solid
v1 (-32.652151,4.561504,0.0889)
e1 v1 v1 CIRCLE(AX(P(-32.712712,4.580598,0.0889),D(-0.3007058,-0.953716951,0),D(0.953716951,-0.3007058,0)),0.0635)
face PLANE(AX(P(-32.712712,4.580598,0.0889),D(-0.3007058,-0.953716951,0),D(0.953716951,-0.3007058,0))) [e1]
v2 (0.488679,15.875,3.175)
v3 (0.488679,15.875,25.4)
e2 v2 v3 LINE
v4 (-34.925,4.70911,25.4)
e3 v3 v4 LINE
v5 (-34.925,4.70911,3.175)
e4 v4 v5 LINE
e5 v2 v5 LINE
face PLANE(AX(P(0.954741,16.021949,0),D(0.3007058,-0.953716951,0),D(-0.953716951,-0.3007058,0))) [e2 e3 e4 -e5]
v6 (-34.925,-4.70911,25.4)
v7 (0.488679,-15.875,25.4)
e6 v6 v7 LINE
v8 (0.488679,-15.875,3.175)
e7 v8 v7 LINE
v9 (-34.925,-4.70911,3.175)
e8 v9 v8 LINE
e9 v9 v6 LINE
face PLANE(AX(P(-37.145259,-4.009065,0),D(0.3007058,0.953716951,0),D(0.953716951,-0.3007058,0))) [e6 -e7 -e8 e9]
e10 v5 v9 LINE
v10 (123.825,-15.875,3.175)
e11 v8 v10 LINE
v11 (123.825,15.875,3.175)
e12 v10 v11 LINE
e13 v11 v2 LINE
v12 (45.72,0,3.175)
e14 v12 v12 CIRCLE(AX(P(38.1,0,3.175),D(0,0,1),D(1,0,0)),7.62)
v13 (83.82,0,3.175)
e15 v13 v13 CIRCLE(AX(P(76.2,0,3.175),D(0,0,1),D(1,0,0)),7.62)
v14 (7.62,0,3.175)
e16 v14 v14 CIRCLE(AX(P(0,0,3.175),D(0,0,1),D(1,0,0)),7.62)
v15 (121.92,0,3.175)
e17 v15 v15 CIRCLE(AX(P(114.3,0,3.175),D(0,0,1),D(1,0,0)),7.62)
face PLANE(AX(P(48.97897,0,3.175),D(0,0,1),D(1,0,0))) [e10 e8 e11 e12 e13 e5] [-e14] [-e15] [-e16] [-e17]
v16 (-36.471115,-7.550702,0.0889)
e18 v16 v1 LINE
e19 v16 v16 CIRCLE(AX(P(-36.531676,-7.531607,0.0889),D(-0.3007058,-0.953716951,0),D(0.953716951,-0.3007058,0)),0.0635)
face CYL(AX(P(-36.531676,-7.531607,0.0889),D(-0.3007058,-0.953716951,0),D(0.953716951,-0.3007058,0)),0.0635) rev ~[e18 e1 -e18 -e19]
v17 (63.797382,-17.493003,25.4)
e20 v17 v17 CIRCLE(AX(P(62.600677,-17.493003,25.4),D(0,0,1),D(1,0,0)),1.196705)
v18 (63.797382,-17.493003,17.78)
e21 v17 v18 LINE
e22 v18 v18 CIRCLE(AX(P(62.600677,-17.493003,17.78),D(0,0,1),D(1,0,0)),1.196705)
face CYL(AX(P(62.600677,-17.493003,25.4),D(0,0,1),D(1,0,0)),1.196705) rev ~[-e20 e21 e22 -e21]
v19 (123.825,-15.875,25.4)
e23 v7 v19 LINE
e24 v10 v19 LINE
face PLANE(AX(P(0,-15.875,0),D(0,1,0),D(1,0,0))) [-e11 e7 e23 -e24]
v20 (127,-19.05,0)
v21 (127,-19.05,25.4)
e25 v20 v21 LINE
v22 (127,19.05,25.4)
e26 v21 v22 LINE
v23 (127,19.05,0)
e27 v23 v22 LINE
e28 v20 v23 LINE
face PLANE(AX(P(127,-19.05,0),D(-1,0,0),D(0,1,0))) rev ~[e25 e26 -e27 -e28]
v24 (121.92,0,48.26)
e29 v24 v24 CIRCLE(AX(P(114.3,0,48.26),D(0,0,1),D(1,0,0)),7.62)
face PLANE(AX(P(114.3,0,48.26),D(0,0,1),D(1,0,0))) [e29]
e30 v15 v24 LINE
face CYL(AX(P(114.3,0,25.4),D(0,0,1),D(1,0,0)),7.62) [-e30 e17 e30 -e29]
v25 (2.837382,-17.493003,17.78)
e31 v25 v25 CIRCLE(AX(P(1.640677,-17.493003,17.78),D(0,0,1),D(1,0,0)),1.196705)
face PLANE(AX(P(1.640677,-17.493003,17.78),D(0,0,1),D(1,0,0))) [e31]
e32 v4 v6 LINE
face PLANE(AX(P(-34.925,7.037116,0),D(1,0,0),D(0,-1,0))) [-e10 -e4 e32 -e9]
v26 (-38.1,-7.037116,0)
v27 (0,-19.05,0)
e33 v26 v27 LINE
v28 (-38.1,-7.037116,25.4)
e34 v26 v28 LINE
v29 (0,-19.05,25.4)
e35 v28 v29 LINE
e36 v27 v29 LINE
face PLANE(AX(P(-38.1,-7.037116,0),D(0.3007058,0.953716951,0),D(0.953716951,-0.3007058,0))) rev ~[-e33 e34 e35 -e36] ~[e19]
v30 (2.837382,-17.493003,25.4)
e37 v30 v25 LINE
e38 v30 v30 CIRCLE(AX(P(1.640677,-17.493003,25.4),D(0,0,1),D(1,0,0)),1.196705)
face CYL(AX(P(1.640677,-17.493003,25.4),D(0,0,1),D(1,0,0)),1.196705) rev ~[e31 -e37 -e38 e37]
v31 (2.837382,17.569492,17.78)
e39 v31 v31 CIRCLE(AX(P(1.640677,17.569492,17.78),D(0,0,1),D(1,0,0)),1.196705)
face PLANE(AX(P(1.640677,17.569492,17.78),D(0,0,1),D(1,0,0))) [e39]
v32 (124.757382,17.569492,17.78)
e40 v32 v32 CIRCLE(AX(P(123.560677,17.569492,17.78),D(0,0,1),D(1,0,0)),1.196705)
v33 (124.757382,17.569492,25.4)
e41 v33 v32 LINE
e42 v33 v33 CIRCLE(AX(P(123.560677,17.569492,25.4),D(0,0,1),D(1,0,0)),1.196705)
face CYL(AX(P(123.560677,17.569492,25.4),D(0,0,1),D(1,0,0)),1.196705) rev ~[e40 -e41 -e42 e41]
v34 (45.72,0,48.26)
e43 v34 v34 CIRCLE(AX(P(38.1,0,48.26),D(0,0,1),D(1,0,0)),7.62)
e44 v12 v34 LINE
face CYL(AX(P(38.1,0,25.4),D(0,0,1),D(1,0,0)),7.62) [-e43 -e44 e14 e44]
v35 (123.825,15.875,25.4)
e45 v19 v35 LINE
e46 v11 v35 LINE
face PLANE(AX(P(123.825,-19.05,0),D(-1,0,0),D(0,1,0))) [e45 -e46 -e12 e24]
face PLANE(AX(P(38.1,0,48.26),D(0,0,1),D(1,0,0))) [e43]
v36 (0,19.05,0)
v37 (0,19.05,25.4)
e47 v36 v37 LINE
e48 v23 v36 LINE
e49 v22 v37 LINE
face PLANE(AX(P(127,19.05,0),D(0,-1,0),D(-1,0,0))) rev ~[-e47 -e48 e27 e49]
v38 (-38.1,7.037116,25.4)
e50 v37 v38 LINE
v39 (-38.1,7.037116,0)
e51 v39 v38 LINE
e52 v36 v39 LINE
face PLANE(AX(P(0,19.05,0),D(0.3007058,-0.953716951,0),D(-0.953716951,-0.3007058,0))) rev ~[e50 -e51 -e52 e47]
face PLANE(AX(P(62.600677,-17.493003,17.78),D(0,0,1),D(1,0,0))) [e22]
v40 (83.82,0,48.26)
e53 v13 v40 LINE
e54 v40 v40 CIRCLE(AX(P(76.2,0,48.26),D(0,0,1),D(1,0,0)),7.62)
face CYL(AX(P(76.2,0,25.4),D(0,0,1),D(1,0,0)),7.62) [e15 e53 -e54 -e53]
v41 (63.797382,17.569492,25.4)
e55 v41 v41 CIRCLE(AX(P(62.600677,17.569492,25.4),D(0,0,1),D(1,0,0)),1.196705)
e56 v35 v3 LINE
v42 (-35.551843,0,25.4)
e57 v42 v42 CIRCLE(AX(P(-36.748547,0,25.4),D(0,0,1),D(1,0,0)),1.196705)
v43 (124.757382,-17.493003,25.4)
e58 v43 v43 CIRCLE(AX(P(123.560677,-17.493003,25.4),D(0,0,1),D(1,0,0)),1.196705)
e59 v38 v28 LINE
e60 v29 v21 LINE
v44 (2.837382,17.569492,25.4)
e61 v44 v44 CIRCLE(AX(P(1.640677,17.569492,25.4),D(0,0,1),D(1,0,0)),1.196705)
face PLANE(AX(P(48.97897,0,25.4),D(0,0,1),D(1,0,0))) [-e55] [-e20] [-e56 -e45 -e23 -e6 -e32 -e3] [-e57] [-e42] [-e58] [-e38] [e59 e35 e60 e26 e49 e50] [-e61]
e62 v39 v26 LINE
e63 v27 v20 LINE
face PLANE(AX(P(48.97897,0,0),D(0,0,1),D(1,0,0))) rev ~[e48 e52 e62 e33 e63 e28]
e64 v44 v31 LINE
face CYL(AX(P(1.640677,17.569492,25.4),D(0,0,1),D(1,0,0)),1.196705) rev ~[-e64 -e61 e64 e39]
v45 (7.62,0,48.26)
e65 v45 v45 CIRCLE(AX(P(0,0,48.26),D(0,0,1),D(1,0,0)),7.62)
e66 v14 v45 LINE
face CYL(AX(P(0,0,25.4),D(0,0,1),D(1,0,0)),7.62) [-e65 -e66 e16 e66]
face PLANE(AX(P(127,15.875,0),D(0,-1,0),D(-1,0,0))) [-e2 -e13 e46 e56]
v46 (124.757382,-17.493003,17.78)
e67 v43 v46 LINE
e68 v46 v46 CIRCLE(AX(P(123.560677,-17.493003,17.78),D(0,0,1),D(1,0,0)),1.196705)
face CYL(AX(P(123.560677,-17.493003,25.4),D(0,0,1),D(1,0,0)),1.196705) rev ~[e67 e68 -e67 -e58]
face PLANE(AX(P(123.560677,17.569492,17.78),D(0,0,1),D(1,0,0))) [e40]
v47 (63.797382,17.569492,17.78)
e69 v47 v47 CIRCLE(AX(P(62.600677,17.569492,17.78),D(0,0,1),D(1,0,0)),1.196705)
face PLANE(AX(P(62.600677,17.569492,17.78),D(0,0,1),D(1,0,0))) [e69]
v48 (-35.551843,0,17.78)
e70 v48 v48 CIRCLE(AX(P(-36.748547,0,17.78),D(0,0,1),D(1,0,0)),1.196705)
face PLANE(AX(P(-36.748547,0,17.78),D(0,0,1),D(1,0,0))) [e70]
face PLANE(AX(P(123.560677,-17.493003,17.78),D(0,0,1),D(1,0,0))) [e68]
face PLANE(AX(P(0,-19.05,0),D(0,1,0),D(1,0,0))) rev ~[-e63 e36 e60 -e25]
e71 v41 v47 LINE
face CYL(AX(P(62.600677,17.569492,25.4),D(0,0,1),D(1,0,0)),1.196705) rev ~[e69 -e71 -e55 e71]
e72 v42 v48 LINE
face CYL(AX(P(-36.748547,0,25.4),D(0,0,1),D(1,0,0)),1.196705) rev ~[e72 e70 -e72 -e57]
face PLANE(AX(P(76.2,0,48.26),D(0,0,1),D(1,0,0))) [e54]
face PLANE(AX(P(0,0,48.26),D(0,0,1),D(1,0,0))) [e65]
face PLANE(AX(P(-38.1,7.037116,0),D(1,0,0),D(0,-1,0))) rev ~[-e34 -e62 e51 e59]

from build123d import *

# Parameters (mm, degrees)
F1_DEPTH      = 25.4
F3_T          = -3.175
F2_R          = 7.62
F4_DEPTH      = 22.86
F4_DEPTH_BACK = 22.225
F5_R          = 1.1967045105
F6_DEPTH      = 7.62
F7_R          = 0.0635
F8_DEPTH      = 12.7


# Not quite as in the source:
# - a feature names something its author has since deleted; it is built from what else it names


with BuildPart() as f1:
    # F0 (on Top) → F1 (new body)
    with BuildSketch(Plane.XY):
        Polygon((-38.1, 7.0371161437), (-38.1, -7.0371161437), (0, -19.05), (127, -19.05), (127, 19.05), (0, 19.05), align=None)
    extrude(amount=F1_DEPTH)

    # F3
    f3_openings = [f1.faces().sort_by_distance(p)[0] for p in [
        (49.931192, 0, 25.4),
    ]]
    offset(amount=F3_T, openings=f3_openings)

    # F2 (on face) → F4 (join, two sides)
    with BuildSketch(Plane.XY.offset(25.4)) as f4_sk:
        Circle(F2_R)
        with Locations((38.1, 0)):
            Circle(F2_R)
        with Locations((76.2, 0)):
            Circle(F2_R)
        with Locations((114.3, 0)):
            Circle(F2_R)
    extrude(amount=F4_DEPTH)
    extrude(f4_sk.sketch, amount=-F4_DEPTH_BACK)

    # F5 (on face) → F6 (cut)
    with BuildSketch(Plane.XY.offset(25.4)):
        with Locations((1.6406770326, 17.5694916397)):
            Circle(F5_R)
        with Locations((62.6006770326, 17.5694916397)):
            Circle(F5_R)
        with Locations((123.5606770326, 17.5694916397)):
            Circle(F5_R)
        with Locations((-36.748547107, 0)):
            Circle(F5_R)
        with Locations((62.6006770326, -17.4930030425)):
            Circle(F5_R)
        with Locations((123.5606770326, -17.4930030425)):
            Circle(F5_R)
        with Locations((1.6406770326, -17.4930030425)):
            Circle(F5_R)
    extrude(amount=-F6_DEPTH, mode=Mode.SUBTRACT)

    # F7 (on face) → F8 (cut)
    with BuildSketch(Plane(origin=(-5.4633155562, -17.3274232219, 0), x_dir=(0.9537169507, -0.3007057995, 0), z_dir=(-0.3007057995, -0.9537169507, 0))):
        with Locations((-32.5760804117, 0.0889)):
            Circle(F7_R)
    extrude(amount=-F8_DEPTH, mode=Mode.SUBTRACT)


solid = f1.part
